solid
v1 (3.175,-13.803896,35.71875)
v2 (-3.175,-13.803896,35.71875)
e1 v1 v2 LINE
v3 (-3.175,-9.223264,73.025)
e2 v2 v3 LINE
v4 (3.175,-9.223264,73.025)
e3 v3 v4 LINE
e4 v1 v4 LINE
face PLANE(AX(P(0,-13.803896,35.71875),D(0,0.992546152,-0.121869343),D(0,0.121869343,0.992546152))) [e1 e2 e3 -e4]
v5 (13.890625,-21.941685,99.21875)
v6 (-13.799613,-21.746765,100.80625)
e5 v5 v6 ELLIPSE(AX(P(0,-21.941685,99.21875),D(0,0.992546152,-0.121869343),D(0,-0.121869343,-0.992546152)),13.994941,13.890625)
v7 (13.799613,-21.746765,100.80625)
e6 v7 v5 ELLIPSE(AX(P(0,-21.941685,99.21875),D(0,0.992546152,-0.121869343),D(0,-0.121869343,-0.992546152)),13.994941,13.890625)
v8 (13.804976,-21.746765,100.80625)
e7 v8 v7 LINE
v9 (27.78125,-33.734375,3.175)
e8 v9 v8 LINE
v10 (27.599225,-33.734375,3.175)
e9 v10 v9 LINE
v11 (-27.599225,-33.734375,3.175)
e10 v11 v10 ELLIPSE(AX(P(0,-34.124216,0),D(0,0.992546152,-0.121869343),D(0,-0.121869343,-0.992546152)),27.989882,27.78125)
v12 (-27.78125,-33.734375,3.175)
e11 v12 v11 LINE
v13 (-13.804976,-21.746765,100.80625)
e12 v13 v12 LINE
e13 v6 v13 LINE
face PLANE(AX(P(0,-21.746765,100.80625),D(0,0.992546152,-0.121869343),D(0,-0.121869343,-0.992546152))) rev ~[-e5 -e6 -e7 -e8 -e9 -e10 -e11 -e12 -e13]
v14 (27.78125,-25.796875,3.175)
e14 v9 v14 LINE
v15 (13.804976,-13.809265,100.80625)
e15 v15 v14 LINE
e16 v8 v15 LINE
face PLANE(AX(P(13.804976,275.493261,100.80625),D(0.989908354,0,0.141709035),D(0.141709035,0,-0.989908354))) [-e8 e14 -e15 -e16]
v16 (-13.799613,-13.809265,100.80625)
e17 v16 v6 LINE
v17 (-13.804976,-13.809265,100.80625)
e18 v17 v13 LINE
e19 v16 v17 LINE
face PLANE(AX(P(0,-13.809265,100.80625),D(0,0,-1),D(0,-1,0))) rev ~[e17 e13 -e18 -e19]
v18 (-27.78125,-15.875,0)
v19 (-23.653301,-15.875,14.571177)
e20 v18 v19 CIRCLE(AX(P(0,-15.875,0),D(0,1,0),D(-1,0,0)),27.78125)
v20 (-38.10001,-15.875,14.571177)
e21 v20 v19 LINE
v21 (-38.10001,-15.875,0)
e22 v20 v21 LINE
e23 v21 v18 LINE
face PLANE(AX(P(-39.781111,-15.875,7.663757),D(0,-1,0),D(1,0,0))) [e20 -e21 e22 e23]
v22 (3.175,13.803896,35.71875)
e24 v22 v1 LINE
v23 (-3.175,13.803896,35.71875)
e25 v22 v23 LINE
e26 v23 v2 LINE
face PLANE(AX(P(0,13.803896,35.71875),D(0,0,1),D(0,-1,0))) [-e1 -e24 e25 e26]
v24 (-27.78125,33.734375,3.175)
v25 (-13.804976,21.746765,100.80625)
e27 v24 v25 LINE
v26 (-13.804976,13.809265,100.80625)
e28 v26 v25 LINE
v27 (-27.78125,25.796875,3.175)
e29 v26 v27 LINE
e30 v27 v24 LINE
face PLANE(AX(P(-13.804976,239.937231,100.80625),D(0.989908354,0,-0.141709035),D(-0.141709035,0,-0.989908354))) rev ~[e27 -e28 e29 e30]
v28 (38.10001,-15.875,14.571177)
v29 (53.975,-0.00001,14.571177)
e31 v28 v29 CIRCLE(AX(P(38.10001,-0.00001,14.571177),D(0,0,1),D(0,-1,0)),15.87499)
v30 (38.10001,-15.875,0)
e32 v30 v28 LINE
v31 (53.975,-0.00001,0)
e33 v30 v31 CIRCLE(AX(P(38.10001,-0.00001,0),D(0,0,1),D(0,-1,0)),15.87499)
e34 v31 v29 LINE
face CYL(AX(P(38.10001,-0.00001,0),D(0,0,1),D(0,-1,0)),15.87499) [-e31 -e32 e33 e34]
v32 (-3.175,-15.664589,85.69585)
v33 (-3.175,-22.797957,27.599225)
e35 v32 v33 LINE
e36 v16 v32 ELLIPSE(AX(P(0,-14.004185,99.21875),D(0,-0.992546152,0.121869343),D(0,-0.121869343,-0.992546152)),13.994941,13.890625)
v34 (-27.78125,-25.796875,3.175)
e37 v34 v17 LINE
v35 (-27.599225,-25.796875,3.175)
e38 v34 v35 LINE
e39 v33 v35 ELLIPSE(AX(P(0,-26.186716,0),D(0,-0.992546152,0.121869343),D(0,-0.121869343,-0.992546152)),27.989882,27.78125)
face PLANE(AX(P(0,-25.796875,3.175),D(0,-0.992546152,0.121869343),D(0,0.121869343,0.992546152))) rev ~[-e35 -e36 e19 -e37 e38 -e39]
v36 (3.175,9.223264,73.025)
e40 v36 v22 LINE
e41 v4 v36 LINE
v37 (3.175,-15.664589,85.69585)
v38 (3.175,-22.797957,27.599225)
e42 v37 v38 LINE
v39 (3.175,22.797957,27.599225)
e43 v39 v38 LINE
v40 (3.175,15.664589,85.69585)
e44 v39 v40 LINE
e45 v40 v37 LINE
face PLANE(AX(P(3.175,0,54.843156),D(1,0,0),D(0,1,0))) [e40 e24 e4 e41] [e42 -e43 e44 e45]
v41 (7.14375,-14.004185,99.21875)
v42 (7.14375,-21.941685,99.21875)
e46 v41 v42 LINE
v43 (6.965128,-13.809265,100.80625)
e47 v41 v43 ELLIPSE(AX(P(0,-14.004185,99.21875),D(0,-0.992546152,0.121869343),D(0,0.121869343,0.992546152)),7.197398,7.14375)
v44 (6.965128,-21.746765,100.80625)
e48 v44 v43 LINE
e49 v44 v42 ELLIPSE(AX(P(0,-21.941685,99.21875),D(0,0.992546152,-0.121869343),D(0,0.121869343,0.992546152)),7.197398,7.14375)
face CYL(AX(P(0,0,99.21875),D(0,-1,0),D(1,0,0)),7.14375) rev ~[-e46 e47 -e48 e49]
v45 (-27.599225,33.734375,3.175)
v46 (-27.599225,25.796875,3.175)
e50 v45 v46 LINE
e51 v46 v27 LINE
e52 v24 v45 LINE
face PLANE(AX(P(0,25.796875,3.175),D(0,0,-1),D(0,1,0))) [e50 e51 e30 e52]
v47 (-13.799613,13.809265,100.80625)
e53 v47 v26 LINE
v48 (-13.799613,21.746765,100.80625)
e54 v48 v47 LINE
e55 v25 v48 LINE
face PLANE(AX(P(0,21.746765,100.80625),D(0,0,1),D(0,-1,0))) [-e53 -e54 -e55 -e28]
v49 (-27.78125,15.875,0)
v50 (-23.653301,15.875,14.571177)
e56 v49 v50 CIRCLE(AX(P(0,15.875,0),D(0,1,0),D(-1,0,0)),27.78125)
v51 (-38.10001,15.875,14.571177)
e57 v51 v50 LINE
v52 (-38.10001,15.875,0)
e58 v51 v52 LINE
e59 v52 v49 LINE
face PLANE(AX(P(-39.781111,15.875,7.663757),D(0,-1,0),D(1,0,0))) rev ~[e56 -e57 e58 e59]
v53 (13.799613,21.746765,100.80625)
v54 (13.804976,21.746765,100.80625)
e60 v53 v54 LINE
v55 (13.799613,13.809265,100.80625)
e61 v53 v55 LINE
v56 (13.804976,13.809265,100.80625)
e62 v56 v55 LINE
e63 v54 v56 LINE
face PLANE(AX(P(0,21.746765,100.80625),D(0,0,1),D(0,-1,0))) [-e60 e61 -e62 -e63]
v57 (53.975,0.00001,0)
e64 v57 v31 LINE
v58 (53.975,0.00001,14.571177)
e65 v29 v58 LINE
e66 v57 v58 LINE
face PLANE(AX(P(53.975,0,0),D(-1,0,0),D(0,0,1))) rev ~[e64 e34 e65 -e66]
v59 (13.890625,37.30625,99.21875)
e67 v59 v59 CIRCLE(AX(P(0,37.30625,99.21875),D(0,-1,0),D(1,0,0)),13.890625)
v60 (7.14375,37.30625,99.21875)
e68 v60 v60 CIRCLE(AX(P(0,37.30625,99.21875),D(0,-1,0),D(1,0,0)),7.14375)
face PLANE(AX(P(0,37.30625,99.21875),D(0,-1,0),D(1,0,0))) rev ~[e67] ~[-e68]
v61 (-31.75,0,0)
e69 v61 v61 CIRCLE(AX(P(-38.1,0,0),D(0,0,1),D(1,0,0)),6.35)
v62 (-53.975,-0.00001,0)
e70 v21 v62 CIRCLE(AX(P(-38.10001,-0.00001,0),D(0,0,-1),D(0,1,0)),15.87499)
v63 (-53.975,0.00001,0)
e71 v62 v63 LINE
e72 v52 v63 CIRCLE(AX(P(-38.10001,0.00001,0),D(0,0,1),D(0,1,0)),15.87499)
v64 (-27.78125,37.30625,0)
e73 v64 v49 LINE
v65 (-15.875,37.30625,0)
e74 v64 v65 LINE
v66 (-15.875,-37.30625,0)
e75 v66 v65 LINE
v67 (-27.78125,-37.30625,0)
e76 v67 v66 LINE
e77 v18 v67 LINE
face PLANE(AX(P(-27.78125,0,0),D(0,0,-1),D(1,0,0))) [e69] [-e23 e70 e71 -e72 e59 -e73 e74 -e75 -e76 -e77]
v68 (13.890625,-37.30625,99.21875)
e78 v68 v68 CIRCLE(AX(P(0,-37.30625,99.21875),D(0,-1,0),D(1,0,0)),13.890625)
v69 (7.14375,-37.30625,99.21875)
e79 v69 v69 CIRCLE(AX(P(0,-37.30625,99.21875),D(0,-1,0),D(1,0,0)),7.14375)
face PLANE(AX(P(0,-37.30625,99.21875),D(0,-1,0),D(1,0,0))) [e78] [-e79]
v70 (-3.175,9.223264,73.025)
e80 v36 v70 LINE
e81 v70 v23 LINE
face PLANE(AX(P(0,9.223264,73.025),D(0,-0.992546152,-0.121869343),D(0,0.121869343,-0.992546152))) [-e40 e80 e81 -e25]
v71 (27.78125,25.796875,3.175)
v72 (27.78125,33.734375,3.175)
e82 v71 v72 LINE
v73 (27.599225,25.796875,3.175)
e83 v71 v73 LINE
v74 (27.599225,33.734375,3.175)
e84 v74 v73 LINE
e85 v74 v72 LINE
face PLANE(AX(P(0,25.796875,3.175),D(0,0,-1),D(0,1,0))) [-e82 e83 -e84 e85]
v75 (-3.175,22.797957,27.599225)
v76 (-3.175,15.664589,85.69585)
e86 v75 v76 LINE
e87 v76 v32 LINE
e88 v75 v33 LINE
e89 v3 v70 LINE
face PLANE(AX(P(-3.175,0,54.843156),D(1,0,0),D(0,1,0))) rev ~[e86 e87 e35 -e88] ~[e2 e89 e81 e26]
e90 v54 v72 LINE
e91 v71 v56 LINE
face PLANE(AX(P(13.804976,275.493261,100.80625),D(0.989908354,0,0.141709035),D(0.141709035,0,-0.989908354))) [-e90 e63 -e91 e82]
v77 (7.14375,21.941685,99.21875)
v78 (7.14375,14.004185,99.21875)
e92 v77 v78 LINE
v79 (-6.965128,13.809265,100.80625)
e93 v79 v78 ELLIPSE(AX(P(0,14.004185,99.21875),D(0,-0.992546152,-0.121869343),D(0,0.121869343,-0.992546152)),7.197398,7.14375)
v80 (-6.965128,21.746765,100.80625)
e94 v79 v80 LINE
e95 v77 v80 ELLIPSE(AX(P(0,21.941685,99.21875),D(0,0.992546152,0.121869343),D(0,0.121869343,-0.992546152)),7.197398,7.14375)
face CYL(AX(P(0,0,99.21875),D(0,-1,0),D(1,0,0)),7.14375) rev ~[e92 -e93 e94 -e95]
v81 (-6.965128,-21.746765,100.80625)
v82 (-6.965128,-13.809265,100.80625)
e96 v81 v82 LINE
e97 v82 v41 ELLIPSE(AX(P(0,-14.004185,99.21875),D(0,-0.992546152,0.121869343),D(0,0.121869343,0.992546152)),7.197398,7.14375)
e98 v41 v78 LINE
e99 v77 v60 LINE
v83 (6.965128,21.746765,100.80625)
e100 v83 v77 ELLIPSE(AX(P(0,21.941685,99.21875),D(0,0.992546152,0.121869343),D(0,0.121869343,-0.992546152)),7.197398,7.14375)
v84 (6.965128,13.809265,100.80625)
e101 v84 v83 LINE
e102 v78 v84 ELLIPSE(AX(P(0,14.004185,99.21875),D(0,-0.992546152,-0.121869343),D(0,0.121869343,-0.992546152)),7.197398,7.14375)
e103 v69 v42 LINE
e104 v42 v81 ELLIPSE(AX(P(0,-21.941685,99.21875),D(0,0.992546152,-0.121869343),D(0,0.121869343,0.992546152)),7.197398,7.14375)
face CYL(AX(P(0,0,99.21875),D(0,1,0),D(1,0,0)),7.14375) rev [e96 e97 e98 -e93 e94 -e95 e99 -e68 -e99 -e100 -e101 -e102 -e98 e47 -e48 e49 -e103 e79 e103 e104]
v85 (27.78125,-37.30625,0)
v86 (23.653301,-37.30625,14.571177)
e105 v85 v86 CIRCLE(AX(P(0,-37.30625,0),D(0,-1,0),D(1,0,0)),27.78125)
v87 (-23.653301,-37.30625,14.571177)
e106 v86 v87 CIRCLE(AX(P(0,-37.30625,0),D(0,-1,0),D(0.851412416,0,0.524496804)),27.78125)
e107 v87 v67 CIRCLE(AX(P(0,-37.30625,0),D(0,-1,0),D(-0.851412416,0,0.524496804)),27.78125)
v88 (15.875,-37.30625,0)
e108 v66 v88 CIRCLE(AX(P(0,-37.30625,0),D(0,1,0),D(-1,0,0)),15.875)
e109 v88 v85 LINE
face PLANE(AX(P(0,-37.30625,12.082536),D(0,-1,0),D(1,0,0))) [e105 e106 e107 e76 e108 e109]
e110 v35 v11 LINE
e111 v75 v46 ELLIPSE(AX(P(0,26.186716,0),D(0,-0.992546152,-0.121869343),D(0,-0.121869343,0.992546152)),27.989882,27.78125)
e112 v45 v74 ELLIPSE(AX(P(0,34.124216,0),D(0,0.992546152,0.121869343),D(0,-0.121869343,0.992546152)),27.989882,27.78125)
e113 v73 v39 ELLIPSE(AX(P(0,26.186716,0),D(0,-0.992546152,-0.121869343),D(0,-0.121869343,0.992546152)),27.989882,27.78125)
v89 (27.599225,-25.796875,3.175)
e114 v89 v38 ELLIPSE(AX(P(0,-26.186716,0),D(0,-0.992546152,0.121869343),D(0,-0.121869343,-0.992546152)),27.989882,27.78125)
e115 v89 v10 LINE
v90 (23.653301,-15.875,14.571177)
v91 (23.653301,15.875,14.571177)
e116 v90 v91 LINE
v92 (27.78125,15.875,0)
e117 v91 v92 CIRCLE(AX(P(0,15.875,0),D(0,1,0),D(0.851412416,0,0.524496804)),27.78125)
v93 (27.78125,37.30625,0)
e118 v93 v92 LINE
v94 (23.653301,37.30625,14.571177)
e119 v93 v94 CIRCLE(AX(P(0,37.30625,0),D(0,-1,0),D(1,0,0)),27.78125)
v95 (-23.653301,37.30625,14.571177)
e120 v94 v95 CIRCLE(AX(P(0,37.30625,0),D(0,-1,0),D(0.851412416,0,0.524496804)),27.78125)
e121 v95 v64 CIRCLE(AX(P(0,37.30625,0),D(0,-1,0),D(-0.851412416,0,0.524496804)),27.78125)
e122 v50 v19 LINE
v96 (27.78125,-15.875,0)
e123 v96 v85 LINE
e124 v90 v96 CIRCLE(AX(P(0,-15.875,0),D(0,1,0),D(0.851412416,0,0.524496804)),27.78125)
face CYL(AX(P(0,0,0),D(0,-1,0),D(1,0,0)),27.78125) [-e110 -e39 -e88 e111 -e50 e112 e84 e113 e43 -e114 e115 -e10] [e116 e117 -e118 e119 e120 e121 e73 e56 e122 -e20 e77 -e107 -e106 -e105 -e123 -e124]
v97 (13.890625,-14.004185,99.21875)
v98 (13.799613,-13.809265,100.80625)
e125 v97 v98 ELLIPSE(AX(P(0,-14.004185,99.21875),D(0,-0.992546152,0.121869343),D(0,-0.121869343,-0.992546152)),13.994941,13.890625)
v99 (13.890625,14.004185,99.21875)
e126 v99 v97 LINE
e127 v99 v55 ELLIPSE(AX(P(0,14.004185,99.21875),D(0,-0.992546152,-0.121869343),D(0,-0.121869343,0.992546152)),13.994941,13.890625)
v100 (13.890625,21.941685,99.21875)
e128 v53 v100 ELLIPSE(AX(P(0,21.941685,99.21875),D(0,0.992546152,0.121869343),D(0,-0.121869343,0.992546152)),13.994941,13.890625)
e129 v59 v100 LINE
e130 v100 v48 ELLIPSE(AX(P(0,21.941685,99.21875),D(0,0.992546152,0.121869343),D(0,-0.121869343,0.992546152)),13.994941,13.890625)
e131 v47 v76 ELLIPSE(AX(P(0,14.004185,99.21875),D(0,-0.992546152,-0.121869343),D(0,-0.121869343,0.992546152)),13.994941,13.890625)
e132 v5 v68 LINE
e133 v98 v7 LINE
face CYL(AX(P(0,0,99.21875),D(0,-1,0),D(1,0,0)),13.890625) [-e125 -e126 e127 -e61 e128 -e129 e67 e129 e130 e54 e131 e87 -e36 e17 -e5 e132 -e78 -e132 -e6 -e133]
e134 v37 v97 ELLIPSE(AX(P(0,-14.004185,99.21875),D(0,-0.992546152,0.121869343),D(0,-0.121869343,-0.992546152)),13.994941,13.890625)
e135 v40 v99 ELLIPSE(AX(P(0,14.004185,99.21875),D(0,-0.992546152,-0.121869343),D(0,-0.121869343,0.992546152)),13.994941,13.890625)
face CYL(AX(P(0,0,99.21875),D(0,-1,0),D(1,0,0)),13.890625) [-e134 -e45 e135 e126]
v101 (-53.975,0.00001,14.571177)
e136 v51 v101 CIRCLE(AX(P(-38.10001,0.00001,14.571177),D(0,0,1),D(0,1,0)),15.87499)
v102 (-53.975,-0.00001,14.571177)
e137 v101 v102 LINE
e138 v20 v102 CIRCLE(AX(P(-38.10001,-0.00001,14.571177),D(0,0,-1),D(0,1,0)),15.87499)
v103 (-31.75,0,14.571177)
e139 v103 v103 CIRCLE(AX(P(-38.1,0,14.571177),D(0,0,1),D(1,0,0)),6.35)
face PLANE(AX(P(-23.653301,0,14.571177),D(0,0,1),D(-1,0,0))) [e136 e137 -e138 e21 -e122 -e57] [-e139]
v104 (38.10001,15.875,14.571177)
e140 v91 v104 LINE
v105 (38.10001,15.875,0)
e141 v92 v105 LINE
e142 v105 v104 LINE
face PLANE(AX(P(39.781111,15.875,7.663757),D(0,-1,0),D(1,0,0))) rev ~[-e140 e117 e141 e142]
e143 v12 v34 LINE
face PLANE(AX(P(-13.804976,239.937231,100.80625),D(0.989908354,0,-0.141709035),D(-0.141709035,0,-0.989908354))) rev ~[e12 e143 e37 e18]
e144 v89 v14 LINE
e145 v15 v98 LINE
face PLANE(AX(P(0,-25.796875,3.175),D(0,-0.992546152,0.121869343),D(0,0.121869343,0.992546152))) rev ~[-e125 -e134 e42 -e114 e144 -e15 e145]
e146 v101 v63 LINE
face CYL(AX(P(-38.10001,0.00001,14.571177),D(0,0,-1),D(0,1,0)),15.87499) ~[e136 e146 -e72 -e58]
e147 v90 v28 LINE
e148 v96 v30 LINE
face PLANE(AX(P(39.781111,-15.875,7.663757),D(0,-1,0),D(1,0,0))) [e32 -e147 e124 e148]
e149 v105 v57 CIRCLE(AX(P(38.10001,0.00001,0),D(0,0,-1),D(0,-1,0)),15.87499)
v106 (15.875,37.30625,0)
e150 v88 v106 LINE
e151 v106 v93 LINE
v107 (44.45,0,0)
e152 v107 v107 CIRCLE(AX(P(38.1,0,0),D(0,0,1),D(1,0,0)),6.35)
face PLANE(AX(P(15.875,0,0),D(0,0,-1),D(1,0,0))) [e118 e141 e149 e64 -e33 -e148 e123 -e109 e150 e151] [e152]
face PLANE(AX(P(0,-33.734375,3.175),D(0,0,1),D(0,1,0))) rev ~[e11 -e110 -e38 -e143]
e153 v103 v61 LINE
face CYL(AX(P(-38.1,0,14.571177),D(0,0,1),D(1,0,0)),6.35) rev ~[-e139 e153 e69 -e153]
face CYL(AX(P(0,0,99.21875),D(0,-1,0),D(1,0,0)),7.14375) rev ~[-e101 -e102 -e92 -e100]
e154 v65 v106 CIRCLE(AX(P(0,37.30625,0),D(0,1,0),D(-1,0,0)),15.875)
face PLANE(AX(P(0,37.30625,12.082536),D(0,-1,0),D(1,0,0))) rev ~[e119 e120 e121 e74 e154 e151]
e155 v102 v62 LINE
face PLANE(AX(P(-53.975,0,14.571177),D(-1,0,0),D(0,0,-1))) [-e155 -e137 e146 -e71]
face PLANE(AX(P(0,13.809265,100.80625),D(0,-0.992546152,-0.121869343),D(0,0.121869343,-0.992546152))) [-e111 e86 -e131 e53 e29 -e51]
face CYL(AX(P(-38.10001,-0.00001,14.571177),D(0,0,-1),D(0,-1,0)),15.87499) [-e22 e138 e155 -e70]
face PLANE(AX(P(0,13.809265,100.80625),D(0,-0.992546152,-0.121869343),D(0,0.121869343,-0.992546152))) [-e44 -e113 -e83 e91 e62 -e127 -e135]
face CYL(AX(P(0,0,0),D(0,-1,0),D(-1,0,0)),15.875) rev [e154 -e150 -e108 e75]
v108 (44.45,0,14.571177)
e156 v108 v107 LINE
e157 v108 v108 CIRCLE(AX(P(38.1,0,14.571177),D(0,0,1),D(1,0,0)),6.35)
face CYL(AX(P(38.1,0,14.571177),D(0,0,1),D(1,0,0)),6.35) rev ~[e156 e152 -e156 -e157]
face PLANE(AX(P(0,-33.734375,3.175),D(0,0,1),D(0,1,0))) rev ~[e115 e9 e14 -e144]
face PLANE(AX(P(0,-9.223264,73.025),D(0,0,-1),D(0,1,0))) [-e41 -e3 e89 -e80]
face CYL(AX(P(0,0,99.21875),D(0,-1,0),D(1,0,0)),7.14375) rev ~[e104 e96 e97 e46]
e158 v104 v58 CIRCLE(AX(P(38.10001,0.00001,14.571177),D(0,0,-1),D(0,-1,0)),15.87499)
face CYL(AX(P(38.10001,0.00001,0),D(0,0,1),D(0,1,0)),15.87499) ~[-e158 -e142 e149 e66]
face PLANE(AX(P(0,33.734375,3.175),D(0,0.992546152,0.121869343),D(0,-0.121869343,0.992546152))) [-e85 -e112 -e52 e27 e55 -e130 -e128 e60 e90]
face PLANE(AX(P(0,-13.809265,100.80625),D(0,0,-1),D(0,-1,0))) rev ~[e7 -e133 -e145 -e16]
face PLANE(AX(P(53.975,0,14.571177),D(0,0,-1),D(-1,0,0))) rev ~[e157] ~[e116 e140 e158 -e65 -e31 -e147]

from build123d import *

# Parameters (mm, degrees)
F1_DEPTH     = 37.30625
F2_DEPTH     = 15.875
F3_R         = 15.87499
F0_R         = 13.890625
F0_R_2       = 7.14375
F4_DEPTH     = 37.30625
F6_DEPTH     = 3.175
F7_DEPTH     = 27.78125
F8_T4_DEPTH  = 515.4304915521
F8_T9_DEPTH  = 515.4304915521
F8_T14_DEPTH = 515.4304915521
F8_T19_DEPTH = 515.4304915521
F8_T24_DEPTH = 515.4304915521
F8_T29_DEPTH = 515.4304915521
F9_DEPTH     = 50.8
F10_R        = 6.35
F11_DEPTH    = 14.5721768419
F12_DEPTH    = 38.1


# Not quite as in the source:
# - a fillet or chamfer that OpenCascade refuses, or shapes differently, is made with other operations: its cross-section is extruded or revolved along the edge and cut away or added
# - a fillet or chamfer is up to 0.001 mm smaller than in the source, because OpenCascade refuses the exact size
# - a feature of the source that left no trace in its solid (it failed there, or was rolled back) is left out


with BuildPart() as f1:
    # F0 (on Front) → F1 (new body, symmetric)
    with BuildSketch(Plane.XZ):
        with BuildLine():
            Line((15.875, 0), (27.78125, 0))
            ThreePointArc((27.78125, 0), (26.7293483379, 7.5723040742), (23.6533011862, 14.5711768419))
            ThreePointArc((23.6533011862, 14.5711768419), (0, 27.78125), (-23.6533011862, 14.5711768419))
            ThreePointArc((-23.6533011862, 14.5711768419), (-26.7293483379, 7.5723040742), (-27.78125, 0))
            Line((-27.78125, 0), (-15.875, 0))
            ThreePointArc((-15.875, 0), (0, 15.875), (15.875, 0))
        make_face()
    extrude(amount=F1_DEPTH, both=True)

    # F0 (on Front) → F2 (join, symmetric)
    with BuildSketch(Plane.XZ):
        with BuildLine():
            ThreePointArc((23.6533011862, 14.5711768419), (26.7293483379, 7.5723040742), (27.78125, 0))
            Line((27.78125, 0), (53.975, 0))
            Line((53.975, 0), (53.975, 14.5711768419))
            Line((53.975, 14.5711768419), (23.6533011862, 14.5711768419))
        make_face()
        with BuildLine():
            ThreePointArc((-27.78125, 0), (-26.7293483379, 7.5723040742), (-23.6533011862, 14.5711768419))
            Line((-23.6533011862, 14.5711768419), (-53.975, 14.5711768419))
            Line((-53.975, 14.5711768419), (-53.975, 0))
            Line((-53.975, 0), (-27.78125, 0))
        make_face()
    extrude(amount=F2_DEPTH, both=True)

    # F3 (radius 15.875 in the source; OpenCascade refuses exactly that, so slightly less here)
    f3_edges = [f1.edges().sort_by_distance(p)[0] for p in [
        (53.975, -15.875, 7.285588),
        (53.975, 15.875, 7.285588),
        (-53.975, -15.875, 7.285588),
        (-53.975, 15.875, 7.285588),
    ]]
    fillet(f3_edges, radius=F3_R)



with BuildPart() as f4:
    # F0 (on Front) → F4 (new body, symmetric)
    with BuildSketch(Plane.XZ):
        with Locations((0, 99.21875)):
            Circle(F0_R)
        with Locations((0, 99.21875)):
            Circle(F0_R_2, mode=Mode.SUBTRACT)
    extrude(amount=F4_DEPTH, both=True)


with BuildPart() as f1_1:
    add(f1.part)

    add(f4.part)  # F6 merges F4
    # F5 (on Right) → F6 (join, symmetric)
    with BuildSketch(Plane.YZ):
        Polygon((-15.1982219998, 89.4941017032), (-23.1018472504, 25.1242396258), (23.1018472504, 25.1242396258), (15.1982219998, 89.4941017032), align=None)
        Polygon((-9.2232641814, 73.025), (9.2232641814, 73.025), (13.8038957065, 35.71875), (-13.8038957065, 35.71875), align=None, mode=Mode.SUBTRACT)
    extrude(amount=F6_DEPTH, both=True)

    # F5 (on Right) → F7 (join, symmetric)
    with BuildSketch(Plane.YZ):
        Polygon((-21.7467648383, 100.80625), (-33.734375, 3.175), (-25.796875, 3.175), (-23.1018472504, 25.1242396258), (-15.1982219998, 89.4941017032), (-13.8092648383, 100.80625), align=None)
        Polygon((15.1982219998, 89.4941017032), (23.1018472504, 25.1242396258), (25.796875, 3.175), (33.734375, 3.175), (21.7467648383, 100.80625), (13.8092648383, 100.80625), align=None)
    extrude(amount=F7_DEPTH, both=True)

    # F8: chamfer of 13.9762738 x 97.63125 on 2 edges, made by hand


with BuildPart() as f8_tool2:
    # F8_s3 → F8_t4 (new body)
    with BuildSketch(Plane.XZ.offset(-275.4932606144)):
        Polygon((13.8049762, 100.80625), (27.78125, 3.175), (27.78125, 100.80625), align=None)
    extrude(amount=F8_T4_DEPTH)

    split(bisect_by=Plane.XY.offset(14.5711768419), keep=Keep.TOP)


with BuildPart() as f1_2:
    add(f1_1.part)

    # F8_t1: cut F8_tool2
    add(f8_tool2.part, mode=Mode.SUBTRACT)


with BuildPart() as f8_tool7:
    # F8_s8 → F8_t9 (new body)
    with BuildSketch(Plane.XZ.offset(-275.4932606144)):
        Polygon((13.8049762, 100.80625), (27.78125, 3.175), (27.78125, 100.80625), align=None)
    extrude(amount=F8_T9_DEPTH)

    split(bisect_by=Plane.XZ.offset(-15.875), keep=Keep.BOTTOM)


with BuildPart() as f1_3:
    add(f1_2.part)

    # F8_t6: cut F8_tool7
    add(f8_tool7.part, mode=Mode.SUBTRACT)


with BuildPart() as f8_tool12:
    # F8_s13 → F8_t14 (new body)
    with BuildSketch(Plane.XZ.offset(-275.4932606144)):
        Polygon((13.8049762, 100.80625), (27.78125, 3.175), (27.78125, 100.80625), align=None)
    extrude(amount=F8_T14_DEPTH)

    split(bisect_by=Plane.XZ.offset(15.875), keep=Keep.TOP)


with BuildPart() as f1_4:
    add(f1_3.part)

    # F8_t11: cut F8_tool12
    add(f8_tool12.part, mode=Mode.SUBTRACT)


with BuildPart() as f8_tool17:
    # F8_s18 → F8_t19 (new body)
    with BuildSketch(Plane.XZ.offset(-239.9372309377)):
        Polygon((-13.8049762, 100.80625), (-27.78125, 3.175), (-27.78125, 100.80625), align=None)
    extrude(amount=F8_T19_DEPTH)

    split(bisect_by=Plane.XY.offset(14.5711768419), keep=Keep.TOP)


with BuildPart() as f1_5:
    add(f1_4.part)

    # F8_t16: cut F8_tool17
    add(f8_tool17.part, mode=Mode.SUBTRACT)


with BuildPart() as f8_tool22:
    # F8_s23 → F8_t24 (new body)
    with BuildSketch(Plane.XZ.offset(-239.9372309377)):
        Polygon((-13.8049762, 100.80625), (-27.78125, 3.175), (-27.78125, 100.80625), align=None)
    extrude(amount=F8_T24_DEPTH)

    split(bisect_by=Plane.XZ.offset(-15.875), keep=Keep.BOTTOM)


with BuildPart() as f1_6:
    add(f1_5.part)

    # F8_t21: cut F8_tool22
    add(f8_tool22.part, mode=Mode.SUBTRACT)


with BuildPart() as f8_tool27:
    # F8_s28 → F8_t29 (new body)
    with BuildSketch(Plane.XZ.offset(-239.9372309377)):
        Polygon((-13.8049762, 100.80625), (-27.78125, 3.175), (-27.78125, 100.80625), align=None)
    extrude(amount=F8_T29_DEPTH)

    split(bisect_by=Plane.XZ.offset(15.875), keep=Keep.TOP)


with BuildPart() as f1_7:
    add(f1_6.part)

    # F8_t26: cut F8_tool27
    add(f8_tool27.part, mode=Mode.SUBTRACT)

    # F0 (on Front) → F9 (cut, symmetric)
    with BuildSketch(Plane.XZ):
        with BuildLine():
            Line((-15.875, 0), (15.875, 0))
            ThreePointArc((15.875, 0), (0, 15.875), (-15.875, 0))
        make_face()
    extrude(amount=F9_DEPTH, both=True, mode=Mode.SUBTRACT)

    # F10 (on face) → F11 (cut, through all)
    with BuildSketch(Plane.XY.offset(14.5711768419)):
        with Locations((-38.1, 0)):
            Circle(F10_R)
        with Locations((38.1, 0)):
            Circle(F10_R)
    extrude(amount=-F11_DEPTH, mode=Mode.SUBTRACT)

    # F0 (on Front) → F12 (cut, symmetric)
    with BuildSketch(Plane.XZ):
        with Locations((0, 99.21875)):
            Circle(F0_R_2)
    extrude(amount=F12_DEPTH, both=True, mode=Mode.SUBTRACT)


solid = f1_7.part
